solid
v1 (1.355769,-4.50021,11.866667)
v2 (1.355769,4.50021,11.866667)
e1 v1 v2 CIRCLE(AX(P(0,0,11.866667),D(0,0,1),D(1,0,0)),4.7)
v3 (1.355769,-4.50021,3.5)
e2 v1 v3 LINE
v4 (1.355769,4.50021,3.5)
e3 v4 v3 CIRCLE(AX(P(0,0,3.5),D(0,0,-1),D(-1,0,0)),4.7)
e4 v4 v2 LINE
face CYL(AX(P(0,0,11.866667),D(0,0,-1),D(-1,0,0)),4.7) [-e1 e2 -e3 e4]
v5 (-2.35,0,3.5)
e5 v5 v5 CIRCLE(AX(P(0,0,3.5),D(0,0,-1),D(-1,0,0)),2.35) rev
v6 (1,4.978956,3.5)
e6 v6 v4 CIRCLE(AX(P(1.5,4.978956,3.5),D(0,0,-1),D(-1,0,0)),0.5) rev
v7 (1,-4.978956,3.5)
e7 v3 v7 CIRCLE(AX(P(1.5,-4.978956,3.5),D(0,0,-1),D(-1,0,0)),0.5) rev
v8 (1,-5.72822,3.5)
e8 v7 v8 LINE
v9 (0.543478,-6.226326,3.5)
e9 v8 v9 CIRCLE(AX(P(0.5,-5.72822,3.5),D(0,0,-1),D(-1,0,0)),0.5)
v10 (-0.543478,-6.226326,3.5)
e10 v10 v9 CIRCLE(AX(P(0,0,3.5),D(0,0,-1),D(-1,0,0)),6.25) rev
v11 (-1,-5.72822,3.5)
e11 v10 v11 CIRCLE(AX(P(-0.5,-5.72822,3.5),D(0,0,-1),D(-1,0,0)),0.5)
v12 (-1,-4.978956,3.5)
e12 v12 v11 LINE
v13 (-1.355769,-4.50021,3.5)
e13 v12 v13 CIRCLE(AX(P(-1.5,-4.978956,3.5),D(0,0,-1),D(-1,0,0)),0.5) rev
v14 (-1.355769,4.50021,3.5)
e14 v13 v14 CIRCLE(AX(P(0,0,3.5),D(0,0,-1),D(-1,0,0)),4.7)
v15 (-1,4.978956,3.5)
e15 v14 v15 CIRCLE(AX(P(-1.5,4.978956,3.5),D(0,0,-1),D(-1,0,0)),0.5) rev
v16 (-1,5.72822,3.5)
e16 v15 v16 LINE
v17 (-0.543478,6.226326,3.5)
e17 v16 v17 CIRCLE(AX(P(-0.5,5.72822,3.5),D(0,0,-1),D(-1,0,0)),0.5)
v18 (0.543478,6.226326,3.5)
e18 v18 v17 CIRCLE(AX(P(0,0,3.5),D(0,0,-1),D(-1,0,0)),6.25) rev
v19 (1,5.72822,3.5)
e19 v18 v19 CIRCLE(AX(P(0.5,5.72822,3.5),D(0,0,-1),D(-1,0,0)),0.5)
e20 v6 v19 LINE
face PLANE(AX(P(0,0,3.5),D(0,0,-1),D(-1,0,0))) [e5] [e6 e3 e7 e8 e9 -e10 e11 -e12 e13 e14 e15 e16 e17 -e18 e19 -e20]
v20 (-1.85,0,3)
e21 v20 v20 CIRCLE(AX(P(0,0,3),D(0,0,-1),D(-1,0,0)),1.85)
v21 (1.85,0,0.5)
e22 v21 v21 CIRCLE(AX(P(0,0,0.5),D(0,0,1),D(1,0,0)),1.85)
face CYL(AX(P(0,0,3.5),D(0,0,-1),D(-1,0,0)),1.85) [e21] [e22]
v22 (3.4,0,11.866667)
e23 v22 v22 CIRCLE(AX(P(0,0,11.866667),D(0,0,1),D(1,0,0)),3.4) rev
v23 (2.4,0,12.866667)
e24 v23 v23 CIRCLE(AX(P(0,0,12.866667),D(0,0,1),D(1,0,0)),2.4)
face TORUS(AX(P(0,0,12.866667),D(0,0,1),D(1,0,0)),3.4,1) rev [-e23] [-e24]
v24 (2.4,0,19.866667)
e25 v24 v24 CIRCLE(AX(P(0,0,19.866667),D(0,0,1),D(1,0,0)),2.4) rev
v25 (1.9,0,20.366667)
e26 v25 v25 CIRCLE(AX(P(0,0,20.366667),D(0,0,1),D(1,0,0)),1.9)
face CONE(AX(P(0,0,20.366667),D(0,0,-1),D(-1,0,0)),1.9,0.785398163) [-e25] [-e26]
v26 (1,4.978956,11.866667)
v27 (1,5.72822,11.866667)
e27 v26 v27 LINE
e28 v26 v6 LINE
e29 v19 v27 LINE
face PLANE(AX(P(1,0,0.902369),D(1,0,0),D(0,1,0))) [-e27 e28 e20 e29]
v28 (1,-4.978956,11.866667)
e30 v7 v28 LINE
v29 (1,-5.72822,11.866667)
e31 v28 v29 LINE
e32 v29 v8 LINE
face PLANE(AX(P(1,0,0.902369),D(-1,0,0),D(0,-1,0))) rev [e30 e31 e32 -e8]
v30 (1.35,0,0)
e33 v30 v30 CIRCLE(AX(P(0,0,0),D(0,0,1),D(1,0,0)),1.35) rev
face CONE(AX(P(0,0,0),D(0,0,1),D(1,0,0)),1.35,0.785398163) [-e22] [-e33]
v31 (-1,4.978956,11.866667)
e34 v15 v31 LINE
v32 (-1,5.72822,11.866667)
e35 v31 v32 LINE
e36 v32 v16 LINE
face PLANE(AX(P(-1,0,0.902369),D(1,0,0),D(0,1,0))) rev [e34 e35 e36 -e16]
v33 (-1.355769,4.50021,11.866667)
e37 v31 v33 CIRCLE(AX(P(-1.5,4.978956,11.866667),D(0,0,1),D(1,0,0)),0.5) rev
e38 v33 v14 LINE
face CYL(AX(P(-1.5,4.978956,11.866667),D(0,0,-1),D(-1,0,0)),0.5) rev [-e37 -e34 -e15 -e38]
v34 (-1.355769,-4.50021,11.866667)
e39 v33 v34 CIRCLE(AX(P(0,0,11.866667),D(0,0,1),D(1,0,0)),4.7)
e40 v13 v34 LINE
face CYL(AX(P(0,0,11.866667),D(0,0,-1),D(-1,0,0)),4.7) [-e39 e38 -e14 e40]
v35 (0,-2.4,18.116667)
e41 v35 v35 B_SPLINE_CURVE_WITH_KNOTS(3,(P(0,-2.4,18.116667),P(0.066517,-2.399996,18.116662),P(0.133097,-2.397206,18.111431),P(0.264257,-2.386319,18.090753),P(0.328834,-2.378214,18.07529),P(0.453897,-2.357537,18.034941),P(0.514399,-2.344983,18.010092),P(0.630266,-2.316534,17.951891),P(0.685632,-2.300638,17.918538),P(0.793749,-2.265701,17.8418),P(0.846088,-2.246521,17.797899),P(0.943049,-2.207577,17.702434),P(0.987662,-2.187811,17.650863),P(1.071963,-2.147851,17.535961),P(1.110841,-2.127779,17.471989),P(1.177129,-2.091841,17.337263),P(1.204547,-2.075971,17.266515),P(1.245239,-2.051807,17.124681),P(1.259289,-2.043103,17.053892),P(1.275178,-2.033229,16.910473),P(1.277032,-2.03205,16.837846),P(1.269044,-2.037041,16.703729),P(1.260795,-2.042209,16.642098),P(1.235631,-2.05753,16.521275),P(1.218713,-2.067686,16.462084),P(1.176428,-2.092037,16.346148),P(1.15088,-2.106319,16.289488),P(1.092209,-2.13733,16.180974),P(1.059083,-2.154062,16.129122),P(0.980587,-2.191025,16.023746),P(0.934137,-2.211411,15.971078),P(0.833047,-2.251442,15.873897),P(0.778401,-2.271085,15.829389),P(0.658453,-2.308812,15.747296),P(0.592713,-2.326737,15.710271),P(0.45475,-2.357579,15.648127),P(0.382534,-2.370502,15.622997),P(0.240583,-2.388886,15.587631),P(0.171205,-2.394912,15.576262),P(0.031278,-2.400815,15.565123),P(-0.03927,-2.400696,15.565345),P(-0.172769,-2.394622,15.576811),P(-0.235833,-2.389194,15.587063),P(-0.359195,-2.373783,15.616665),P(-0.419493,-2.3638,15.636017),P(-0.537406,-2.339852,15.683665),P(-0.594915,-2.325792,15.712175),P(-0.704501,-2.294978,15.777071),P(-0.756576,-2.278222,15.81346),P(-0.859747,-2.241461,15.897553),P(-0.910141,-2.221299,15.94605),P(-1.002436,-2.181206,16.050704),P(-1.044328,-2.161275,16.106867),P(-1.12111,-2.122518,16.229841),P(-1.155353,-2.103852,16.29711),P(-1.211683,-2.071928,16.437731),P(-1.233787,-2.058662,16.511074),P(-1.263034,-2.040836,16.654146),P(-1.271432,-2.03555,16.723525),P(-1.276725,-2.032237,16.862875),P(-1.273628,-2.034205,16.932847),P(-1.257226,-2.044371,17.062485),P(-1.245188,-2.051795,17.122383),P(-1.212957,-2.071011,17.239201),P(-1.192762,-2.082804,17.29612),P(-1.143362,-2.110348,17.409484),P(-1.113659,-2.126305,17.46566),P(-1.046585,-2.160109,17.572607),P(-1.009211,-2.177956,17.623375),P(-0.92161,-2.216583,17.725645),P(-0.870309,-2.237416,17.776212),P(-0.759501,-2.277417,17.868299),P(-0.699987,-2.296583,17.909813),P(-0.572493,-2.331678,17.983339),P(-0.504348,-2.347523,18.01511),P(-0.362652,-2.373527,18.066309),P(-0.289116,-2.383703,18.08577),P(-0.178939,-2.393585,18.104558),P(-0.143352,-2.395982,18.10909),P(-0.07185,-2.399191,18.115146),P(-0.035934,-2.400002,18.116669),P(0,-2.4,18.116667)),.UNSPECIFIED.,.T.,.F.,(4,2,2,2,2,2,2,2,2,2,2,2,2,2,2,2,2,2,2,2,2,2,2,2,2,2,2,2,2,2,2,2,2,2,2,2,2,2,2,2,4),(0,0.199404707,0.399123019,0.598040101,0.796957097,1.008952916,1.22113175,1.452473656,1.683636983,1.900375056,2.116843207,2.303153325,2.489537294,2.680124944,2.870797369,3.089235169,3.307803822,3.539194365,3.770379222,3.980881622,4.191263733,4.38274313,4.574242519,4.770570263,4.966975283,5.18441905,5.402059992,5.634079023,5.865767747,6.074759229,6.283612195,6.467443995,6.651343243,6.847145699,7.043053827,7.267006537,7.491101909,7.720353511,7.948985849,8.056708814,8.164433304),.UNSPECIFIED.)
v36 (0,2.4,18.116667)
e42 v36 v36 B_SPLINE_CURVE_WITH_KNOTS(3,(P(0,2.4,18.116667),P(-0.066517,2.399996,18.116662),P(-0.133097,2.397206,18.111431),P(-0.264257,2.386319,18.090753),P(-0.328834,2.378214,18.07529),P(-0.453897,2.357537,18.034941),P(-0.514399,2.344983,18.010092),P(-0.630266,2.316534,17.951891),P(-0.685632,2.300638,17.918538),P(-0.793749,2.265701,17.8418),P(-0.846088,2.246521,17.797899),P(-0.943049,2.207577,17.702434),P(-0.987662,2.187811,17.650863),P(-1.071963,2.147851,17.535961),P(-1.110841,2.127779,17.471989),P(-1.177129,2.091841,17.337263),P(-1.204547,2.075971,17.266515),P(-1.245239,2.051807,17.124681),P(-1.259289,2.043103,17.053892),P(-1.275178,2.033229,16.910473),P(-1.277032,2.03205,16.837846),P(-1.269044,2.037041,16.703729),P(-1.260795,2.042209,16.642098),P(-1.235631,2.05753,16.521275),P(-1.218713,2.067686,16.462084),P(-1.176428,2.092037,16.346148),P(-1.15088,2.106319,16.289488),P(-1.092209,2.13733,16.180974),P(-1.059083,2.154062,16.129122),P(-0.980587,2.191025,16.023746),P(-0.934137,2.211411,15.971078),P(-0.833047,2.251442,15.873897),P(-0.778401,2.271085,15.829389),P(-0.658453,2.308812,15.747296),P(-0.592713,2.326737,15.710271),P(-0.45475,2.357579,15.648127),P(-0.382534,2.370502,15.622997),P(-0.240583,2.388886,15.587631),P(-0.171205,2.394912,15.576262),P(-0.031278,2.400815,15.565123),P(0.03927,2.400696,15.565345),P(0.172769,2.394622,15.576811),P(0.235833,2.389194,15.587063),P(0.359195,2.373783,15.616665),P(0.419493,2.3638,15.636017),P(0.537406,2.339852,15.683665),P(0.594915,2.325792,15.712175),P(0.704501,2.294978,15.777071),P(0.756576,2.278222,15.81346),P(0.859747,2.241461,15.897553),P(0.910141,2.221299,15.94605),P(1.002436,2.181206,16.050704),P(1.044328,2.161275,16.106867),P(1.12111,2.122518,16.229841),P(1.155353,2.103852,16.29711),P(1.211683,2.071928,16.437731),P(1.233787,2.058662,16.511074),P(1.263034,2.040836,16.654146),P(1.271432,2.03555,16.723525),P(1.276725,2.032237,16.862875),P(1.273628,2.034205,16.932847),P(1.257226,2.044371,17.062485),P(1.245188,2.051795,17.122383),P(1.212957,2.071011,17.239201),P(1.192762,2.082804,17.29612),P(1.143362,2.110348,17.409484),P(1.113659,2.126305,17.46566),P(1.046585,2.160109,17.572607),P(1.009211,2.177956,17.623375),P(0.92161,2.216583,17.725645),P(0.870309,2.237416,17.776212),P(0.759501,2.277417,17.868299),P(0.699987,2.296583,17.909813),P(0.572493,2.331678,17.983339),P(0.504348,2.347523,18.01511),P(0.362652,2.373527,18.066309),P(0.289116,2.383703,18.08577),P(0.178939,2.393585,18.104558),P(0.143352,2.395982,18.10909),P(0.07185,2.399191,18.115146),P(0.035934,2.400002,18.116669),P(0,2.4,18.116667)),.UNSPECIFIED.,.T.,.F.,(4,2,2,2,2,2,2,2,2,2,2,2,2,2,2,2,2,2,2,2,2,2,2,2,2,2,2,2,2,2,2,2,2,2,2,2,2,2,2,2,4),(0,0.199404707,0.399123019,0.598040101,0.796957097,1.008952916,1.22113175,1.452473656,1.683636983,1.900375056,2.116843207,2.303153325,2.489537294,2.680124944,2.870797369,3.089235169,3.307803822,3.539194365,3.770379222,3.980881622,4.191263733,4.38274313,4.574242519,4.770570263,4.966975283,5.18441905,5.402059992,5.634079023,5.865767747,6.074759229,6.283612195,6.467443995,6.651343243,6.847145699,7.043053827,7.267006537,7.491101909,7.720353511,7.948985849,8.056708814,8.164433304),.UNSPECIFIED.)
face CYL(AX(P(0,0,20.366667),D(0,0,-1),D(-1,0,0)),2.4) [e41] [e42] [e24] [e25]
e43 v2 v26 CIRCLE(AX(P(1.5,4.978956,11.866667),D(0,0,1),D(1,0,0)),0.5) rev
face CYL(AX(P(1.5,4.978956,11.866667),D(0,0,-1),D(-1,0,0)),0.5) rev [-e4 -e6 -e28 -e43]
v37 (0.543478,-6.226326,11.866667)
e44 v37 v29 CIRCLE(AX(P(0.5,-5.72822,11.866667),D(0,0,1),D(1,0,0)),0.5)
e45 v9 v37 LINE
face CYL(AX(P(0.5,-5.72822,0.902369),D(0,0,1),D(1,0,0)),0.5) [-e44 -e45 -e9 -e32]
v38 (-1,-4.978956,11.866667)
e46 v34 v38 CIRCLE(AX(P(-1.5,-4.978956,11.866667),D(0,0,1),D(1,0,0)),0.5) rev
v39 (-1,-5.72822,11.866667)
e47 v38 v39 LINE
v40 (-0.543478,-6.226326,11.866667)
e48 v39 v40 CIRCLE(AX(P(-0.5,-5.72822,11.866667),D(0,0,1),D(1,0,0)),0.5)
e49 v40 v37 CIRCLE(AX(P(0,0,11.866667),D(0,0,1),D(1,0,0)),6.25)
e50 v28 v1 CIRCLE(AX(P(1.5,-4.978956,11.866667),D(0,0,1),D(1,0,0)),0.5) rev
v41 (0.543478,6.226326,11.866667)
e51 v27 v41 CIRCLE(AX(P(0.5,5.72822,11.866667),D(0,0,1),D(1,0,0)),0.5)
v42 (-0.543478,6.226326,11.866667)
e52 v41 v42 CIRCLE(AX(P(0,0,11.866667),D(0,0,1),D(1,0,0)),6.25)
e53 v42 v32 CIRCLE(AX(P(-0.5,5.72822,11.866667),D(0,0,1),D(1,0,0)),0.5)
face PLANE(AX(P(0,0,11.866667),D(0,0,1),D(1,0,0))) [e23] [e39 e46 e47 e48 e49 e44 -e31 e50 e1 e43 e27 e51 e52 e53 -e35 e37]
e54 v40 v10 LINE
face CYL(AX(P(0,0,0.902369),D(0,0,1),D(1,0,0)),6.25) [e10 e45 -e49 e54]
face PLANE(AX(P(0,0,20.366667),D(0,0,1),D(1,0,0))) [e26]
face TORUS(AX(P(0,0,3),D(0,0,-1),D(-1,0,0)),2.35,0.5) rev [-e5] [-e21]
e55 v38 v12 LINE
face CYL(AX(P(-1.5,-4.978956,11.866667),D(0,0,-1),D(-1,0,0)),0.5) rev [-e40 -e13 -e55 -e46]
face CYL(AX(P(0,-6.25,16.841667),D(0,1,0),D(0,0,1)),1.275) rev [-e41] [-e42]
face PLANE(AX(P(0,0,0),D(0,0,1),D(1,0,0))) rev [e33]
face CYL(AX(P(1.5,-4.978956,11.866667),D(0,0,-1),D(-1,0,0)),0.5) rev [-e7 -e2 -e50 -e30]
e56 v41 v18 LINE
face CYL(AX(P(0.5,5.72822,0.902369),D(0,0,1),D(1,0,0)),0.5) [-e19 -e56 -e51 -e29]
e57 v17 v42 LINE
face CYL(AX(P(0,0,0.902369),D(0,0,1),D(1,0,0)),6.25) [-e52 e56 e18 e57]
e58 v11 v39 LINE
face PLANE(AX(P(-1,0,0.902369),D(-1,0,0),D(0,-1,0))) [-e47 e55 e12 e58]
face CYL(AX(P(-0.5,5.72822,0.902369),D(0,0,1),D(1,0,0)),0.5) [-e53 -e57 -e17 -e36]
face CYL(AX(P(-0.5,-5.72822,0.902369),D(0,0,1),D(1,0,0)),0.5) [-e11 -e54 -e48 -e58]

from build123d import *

# Parameters (mm, degrees)
SKETCH1_R               = 4.7
BOSS_EXTRUDE1_DEPTH     = 11.866666667
SKETCH2_OUTSIDE_W       = 14.964
SKETCH2_OUTSIDE_H       = 14.964
SKETCH2_OUTSIDE_R       = 1.85
CUT_EXTRUDE1_DEPTH      = 3.5
BOSS_EXTRUDE2_START     = -8.366666667
BOSS_EXTRUDE2_DEPTH     = 8.366666667
FILLET1_R               = 0.5
FILLET2_R               = 0.5
SKETCH4_R               = 2.4
BOSS_EXTRUDE3_DEPTH     = 8.5
FILLET3_R               = 1
CHAMFER1_SIZE           = 0.5
CUT_EXTRUDE2_DEPTH      = 22.816361088
CUT_EXTRUDE2_DEPTH_BACK = 22.816361088
SKETCH5_R               = 1.275


with BuildPart() as part:
    # Sketch1 → Boss-Extrude1 (new body)
    with BuildSketch(Plane.XY):
        Circle(SKETCH1_R)
    extrude(amount=BOSS_EXTRUDE1_DEPTH)

    # Sketch2 outside → Cut-Extrude1 (cut)
    with BuildSketch(Plane(origin=(0, 0, 0), x_dir=(-1, 0, 0), z_dir=(0, 0, -1))):
        Rectangle(SKETCH2_OUTSIDE_W, SKETCH2_OUTSIDE_H)
        Circle(SKETCH2_OUTSIDE_R, mode=Mode.SUBTRACT)
    extrude(amount=-CUT_EXTRUDE1_DEPTH, mode=Mode.SUBTRACT)

    # Sketch3 → Boss-Extrude2 (add)
    with BuildSketch(Plane.XY.offset(11.866666667).offset(BOSS_EXTRUDE2_START)):
        with BuildLine():
            Line((-1, 6.16948134), (-1, 4.592385001))
            ThreePointArc((-1, 4.592385001), (0, 4.7), (1, 4.592385001))
            Line((1, 4.592385001), (1, 6.16948134))
            ThreePointArc((1, 6.16948134), (0, 6.25), (-1, 6.16948134))
        make_face()
        with BuildLine():
            ThreePointArc((1, -4.592385001), (0, -4.7), (-1, -4.592385001))
            Line((-1, -4.592385001), (-1, -6.16948134))
            ThreePointArc((-1, -6.16948134), (0, -6.25), (1, -6.16948134))
            Line((1, -6.16948134), (1, -4.592385001))
        make_face()
    extrude(amount=BOSS_EXTRUDE2_DEPTH)

    # Fillet1
    fillet1_edges = [part.edges().sort_by_distance(p)[0] for p in [
        (-1, 6.16948134, 7.683333333),
        (-1, 4.592385001, 7.683333333),
        (1, 4.592385001, 7.683333333),
        (1, 6.16948134, 7.683333333),
        (1, -6.16948134, 7.683333333),
        (1, -4.592385001, 7.683333333),
        (-1, -4.592385001, 7.683333333),
        (-1, -6.16948134, 7.683333333),
    ]]
    fillet(fillet1_edges, radius=FILLET1_R)

    # Fillet2
    fillet2_edges = [part.edges().sort_by_distance(p)[0] for p in [
        (1.85, 0, 3.5),
    ]]
    fillet(fillet2_edges, radius=FILLET2_R)

    # Sketch4 → Boss-Extrude3 (add)
    with BuildSketch(Plane.XY.offset(11.866666667)):
        Circle(SKETCH4_R)
    extrude(amount=BOSS_EXTRUDE3_DEPTH)

    # Fillet3
    fillet3_edges = [part.edges().sort_by_distance(p)[0] for p in [
        (-2.4, 0, 11.866666667),
    ]]
    fillet(fillet3_edges, radius=FILLET3_R)

    # Chamfer1
    chamfer1_edges = [part.edges().sort_by_distance(p)[0] for p in [
        (1.85, 0, 0),
        (-2.4, 0, 20.366666667),
    ]]
    chamfer(chamfer1_edges, length=CHAMFER1_SIZE)

    # Sketch5 → Cut-Extrude2 (cut, two sides: drawn at the far end of the back side and taken through both)
    with BuildSketch(Plane(origin=(0, 0, 0), x_dir=(1, 0, 0), z_dir=(0, 1, 0)).offset(-CUT_EXTRUDE2_DEPTH_BACK)):
        with Locations(Location((0, -16.841666667, 0), (0, 0, 270))):
            Circle(SKETCH5_R)
    extrude(amount=CUT_EXTRUDE2_DEPTH + CUT_EXTRUDE2_DEPTH_BACK, mode=Mode.SUBTRACT)


solid = part.part
